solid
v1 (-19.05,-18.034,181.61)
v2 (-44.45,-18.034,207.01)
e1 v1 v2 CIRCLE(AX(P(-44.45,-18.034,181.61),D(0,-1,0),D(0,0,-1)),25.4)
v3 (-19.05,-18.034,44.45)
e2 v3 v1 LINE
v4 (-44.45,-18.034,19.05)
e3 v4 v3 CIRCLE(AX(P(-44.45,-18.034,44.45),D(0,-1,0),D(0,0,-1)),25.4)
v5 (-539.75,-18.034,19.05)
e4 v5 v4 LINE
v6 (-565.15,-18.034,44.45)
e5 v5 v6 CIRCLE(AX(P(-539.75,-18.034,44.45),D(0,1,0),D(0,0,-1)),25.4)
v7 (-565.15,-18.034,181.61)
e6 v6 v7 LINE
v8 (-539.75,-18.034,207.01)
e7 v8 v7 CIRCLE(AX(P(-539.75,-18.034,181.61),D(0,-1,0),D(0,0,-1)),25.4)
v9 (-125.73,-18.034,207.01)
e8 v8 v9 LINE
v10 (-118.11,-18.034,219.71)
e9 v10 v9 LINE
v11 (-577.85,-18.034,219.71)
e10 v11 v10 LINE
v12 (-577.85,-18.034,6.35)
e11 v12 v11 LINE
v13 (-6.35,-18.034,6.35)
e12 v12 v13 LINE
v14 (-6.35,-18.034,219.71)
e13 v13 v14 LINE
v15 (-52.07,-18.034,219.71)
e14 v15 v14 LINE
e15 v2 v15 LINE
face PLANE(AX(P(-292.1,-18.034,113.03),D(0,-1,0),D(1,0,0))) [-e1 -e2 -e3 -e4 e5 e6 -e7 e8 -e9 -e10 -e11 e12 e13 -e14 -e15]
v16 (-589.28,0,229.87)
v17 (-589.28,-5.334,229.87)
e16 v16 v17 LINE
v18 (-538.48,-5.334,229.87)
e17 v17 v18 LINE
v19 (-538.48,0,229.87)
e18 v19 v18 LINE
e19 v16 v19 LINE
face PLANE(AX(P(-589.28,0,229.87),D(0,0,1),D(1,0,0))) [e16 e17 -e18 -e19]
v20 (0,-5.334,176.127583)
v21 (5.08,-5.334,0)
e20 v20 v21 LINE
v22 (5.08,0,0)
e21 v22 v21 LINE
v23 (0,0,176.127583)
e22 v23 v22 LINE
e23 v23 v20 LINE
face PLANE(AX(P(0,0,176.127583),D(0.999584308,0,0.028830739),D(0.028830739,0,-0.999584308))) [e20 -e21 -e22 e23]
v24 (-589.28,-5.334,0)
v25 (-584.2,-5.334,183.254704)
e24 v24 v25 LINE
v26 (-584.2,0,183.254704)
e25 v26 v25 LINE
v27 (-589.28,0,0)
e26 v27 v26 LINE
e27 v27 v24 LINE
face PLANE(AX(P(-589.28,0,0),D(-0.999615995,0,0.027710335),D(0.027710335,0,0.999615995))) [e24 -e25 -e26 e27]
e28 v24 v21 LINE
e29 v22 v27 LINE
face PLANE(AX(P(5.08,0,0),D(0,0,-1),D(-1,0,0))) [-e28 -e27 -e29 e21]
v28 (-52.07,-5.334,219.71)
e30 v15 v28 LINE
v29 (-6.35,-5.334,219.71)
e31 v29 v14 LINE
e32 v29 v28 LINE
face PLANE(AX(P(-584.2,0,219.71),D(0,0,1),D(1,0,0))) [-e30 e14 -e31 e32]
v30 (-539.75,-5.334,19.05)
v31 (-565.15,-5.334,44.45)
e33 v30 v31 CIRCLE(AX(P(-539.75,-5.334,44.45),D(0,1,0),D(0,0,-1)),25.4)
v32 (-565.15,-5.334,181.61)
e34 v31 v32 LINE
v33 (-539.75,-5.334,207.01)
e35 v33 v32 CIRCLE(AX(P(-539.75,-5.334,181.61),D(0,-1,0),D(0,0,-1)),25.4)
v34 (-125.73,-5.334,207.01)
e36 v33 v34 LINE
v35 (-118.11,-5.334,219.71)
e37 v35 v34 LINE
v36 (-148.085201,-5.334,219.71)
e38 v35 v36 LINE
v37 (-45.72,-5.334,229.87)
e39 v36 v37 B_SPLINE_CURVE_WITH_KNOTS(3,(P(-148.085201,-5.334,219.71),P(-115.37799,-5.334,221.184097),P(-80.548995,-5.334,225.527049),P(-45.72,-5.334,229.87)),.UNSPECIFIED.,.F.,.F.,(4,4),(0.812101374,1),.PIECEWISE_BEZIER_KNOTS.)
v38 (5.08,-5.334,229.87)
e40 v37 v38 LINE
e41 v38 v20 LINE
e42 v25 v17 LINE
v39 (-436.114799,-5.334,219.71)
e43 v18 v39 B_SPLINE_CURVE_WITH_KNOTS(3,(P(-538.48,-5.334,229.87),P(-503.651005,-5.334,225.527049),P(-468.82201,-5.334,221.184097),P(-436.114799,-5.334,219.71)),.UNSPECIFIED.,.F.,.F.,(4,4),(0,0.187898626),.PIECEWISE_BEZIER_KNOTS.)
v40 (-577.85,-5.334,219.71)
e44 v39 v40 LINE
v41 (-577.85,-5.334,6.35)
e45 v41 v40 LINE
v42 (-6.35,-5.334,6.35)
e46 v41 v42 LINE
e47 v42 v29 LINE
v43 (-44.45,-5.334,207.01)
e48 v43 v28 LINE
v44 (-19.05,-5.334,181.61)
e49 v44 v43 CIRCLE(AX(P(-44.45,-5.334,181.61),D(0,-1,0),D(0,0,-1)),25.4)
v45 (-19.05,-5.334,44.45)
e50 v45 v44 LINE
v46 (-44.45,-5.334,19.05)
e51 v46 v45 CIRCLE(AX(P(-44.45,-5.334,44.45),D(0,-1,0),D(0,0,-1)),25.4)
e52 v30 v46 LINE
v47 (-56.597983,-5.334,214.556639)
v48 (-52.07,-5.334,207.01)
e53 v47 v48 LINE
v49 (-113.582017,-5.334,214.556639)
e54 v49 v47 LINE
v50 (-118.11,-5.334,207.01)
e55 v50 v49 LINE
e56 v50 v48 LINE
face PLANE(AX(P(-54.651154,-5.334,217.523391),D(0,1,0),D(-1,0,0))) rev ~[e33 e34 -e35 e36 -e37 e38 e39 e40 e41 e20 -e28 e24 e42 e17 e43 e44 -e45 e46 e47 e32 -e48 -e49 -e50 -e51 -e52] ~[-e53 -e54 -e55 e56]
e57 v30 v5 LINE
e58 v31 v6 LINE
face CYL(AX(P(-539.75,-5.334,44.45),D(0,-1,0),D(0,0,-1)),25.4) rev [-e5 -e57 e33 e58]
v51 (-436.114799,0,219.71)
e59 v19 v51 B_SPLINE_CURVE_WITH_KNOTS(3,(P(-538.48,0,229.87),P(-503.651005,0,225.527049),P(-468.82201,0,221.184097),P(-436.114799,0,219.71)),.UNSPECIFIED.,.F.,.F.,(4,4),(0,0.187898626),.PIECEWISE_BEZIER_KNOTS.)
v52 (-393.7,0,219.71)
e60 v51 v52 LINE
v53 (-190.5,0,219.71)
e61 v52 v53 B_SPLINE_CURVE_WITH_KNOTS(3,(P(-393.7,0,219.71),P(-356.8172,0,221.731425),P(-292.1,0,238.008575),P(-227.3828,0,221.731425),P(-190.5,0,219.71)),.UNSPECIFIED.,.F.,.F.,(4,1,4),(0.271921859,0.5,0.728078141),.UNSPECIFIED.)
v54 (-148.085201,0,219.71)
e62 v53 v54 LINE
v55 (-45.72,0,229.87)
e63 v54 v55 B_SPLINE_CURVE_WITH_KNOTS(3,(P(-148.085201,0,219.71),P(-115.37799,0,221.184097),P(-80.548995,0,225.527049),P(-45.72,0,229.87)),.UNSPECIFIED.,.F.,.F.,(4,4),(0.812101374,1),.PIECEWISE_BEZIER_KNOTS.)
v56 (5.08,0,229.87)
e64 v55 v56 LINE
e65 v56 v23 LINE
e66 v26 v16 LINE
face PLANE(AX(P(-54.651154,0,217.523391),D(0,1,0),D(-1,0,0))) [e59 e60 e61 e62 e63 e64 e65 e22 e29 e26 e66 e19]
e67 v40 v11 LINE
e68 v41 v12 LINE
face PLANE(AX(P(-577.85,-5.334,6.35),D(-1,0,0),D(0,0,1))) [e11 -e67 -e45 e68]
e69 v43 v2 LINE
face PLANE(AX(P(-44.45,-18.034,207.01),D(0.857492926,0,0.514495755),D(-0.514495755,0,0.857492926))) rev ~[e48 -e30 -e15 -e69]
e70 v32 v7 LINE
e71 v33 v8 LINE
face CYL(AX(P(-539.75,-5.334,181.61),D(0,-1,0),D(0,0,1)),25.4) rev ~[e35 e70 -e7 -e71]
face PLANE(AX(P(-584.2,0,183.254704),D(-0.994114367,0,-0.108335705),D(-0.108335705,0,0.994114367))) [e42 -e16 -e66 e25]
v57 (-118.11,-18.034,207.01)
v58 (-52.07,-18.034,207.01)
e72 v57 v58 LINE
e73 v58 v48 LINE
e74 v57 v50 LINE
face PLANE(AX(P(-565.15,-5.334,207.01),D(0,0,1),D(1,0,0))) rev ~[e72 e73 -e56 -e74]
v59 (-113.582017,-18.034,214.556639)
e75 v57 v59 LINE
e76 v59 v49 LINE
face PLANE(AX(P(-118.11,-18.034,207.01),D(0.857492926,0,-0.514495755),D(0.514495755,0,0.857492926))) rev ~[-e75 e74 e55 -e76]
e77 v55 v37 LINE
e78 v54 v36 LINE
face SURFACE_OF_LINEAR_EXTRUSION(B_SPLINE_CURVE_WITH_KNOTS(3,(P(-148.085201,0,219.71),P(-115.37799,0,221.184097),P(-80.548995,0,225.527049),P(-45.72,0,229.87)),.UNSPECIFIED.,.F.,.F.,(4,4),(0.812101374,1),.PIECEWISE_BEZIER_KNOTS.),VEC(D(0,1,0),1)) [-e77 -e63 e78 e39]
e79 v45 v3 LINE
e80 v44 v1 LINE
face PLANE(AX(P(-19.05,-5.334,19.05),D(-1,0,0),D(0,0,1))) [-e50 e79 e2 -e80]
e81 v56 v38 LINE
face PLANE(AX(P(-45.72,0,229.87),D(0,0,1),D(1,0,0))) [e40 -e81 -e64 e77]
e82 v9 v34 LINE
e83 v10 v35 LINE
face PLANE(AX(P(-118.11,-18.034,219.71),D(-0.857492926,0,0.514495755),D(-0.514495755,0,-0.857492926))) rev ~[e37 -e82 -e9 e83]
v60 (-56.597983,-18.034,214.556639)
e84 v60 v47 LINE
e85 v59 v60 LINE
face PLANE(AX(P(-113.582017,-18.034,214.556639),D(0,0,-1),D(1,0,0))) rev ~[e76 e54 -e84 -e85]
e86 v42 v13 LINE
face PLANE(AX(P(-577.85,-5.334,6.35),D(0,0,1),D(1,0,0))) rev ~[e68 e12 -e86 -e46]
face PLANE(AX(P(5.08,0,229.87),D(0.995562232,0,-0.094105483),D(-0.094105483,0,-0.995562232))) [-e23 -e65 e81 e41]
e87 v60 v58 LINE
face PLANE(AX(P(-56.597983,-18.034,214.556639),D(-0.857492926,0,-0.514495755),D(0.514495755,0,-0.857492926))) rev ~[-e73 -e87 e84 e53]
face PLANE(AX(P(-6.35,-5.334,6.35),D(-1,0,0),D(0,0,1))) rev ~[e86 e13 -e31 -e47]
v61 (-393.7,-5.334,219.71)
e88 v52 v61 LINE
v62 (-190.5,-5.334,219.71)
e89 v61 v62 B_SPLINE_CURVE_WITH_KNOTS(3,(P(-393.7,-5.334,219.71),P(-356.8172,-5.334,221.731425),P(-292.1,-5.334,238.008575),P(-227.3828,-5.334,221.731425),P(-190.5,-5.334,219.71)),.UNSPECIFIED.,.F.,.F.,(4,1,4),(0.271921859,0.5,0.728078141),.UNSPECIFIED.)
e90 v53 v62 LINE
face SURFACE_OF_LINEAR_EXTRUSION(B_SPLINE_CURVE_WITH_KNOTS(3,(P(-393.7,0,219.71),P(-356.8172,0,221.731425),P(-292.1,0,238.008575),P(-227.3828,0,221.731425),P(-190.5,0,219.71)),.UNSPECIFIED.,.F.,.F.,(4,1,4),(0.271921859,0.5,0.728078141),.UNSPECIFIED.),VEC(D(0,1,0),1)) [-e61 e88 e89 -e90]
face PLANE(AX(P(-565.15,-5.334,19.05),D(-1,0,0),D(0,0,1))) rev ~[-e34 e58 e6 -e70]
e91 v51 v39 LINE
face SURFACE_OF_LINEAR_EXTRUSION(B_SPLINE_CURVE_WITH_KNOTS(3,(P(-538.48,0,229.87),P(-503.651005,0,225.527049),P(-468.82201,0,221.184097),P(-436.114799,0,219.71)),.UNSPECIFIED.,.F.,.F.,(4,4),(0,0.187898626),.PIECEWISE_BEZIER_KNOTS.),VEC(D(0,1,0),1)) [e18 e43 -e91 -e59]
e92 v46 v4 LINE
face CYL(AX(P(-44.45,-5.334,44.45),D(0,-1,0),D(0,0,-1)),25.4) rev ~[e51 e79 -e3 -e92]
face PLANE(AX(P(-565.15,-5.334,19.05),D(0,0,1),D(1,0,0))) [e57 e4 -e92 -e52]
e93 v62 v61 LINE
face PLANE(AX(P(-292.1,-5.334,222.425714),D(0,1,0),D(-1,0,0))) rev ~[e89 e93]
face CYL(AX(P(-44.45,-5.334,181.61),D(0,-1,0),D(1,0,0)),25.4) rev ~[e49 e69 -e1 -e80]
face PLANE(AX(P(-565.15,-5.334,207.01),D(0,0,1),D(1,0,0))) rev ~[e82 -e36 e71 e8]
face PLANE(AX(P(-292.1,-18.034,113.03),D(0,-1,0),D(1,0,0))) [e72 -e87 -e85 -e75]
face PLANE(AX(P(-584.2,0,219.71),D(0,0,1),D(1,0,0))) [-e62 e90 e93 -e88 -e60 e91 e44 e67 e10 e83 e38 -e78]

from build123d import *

# Parameters (mm, degrees)
F0_W     = 584.2
F0_H     = 219.71
F1_DEPTH = 5.334
F2_W     = 571.5
F2_H     = 213.36
F2_W_2   = 546.1
F2_H_2   = 187.96
F3_DEPTH = 12.7
F4_R     = 25.4
F6_DEPTH = 12.7
F8_DEPTH = 5.334


# Not quite as in the source:
# - a feature names something its author has since deleted; it is built from what else it names


with BuildPart() as f1:
    # F0 (on Front) → F1 (new body)
    with BuildSketch(Plane.XZ):
        with Locations((-292.1, 109.855)):
            Rectangle(F0_W, F0_H)
    extrude(amount=F1_DEPTH)

    # F2 (on face) → F3 (join)
    with BuildSketch(Plane.XZ.offset(5.334)):
        with Locations((-292.1, 113.03)):
            Rectangle(F2_W, F2_H)
        with Locations((-292.1, 113.03)):
            Rectangle(F2_W_2, F2_H_2, mode=Mode.SUBTRACT)
    extrude(amount=F3_DEPTH)

    # F4
    f4_edges = [f1.edges().sort_by_distance(p)[0] for p in [
        (-565.15, -11.684, 207.01),
        (-19.05, -11.684, 207.01),
        (-19.05, -11.684, 19.05),
        (-565.15, -11.684, 19.05),
    ]]
    fillet(f4_edges, radius=F4_R)

    # F5 (on face) → F6 (cut)
    with BuildSketch(Plane.XZ.offset(18.034)):
        Polygon((-118.11, 219.71), (-125.73, 207.01), (-118.11, 207.01), (-113.5820166854, 214.5566388576), (-110.49, 219.71), align=None)
        Polygon((-56.5979833146, 214.5566388576), (-52.07, 207.01), (-44.45, 207.01), (-52.07, 219.71), (-59.69, 219.71), align=None)
        Polygon((-59.69, 219.71), (-110.49, 219.71), (-113.5820166854, 214.5566388576), (-56.5979833146, 214.5566388576), align=None)
    extrude(amount=-F6_DEPTH, mode=Mode.SUBTRACT)

    # F7 (on face) → F8 (join)
    with BuildSketch(Plane(origin=(0, 0, 0), x_dir=(-1, 0, 0), z_dir=(0, 1, 0))):
        with BuildLine():
            Line((-5.08, 229.87), (0, 176.1275827885))
            Line((0, 176.1275827885), (0, 219.71))
            Line((0, 219.71), (148.0852009026, 219.71))
            add(Edge.make_bspline(
                [(148.0852009026, 219.71), (115.3779899576, 221.1840971885), (80.5489949788, 225.5270485943), (45.72, 229.87)],
                knots=[0.812101374, 0.812101374, 0.812101374, 0.812101374, 1, 1, 1, 1], degree=3))
            Line((45.72, 229.87), (-5.08, 229.87))
        make_face()
        with BuildLine():
            add(Edge.make_bspline(
                [(393.7, 219.71), (356.8171998762, 221.731425099), (324.4585999381, 229.87), (292.1, 229.87)],
                knots=[0.2719218593, 0.2719218593, 0.2719218593, 0.2719218593, 0.5, 0.5, 0.5, 0.5], degree=3))
            add(Edge.make_bspline(
                [(292.1, 229.87), (259.7414000619, 229.87), (227.3828001238, 221.731425099), (190.5, 219.71)],
                knots=[0.5, 0.5, 0.5, 0.5, 0.7280781407, 0.7280781407, 0.7280781407, 0.7280781407], degree=3))
            Line((190.5, 219.71), (393.7, 219.71))
        make_face()
        Polygon((584.2, 183.2547038794), (584.2, 0), (589.28, 0), align=None)
        with BuildLine():
            Line((584.2, 219.71), (584.2, 183.2547038794))
            Line((584.2, 183.2547038794), (589.28, 229.87))
            Line((589.28, 229.87), (538.48, 229.87))
            add(Edge.make_bspline(
                [(538.48, 229.87), (503.6510050212, 225.5270485943), (468.8220100424, 221.1840971885), (436.1147990974, 219.71)],
                knots=[0, 0, 0, 0, 0.187898626, 0.187898626, 0.187898626, 0.187898626], degree=3))
            Line((436.1147990974, 219.71), (584.2, 219.71))
        make_face()
        Polygon((-5.08, 0), (0, 0), (0, 176.1275827885), align=None)
    extrude(amount=-F8_DEPTH)


solid = f1.part
